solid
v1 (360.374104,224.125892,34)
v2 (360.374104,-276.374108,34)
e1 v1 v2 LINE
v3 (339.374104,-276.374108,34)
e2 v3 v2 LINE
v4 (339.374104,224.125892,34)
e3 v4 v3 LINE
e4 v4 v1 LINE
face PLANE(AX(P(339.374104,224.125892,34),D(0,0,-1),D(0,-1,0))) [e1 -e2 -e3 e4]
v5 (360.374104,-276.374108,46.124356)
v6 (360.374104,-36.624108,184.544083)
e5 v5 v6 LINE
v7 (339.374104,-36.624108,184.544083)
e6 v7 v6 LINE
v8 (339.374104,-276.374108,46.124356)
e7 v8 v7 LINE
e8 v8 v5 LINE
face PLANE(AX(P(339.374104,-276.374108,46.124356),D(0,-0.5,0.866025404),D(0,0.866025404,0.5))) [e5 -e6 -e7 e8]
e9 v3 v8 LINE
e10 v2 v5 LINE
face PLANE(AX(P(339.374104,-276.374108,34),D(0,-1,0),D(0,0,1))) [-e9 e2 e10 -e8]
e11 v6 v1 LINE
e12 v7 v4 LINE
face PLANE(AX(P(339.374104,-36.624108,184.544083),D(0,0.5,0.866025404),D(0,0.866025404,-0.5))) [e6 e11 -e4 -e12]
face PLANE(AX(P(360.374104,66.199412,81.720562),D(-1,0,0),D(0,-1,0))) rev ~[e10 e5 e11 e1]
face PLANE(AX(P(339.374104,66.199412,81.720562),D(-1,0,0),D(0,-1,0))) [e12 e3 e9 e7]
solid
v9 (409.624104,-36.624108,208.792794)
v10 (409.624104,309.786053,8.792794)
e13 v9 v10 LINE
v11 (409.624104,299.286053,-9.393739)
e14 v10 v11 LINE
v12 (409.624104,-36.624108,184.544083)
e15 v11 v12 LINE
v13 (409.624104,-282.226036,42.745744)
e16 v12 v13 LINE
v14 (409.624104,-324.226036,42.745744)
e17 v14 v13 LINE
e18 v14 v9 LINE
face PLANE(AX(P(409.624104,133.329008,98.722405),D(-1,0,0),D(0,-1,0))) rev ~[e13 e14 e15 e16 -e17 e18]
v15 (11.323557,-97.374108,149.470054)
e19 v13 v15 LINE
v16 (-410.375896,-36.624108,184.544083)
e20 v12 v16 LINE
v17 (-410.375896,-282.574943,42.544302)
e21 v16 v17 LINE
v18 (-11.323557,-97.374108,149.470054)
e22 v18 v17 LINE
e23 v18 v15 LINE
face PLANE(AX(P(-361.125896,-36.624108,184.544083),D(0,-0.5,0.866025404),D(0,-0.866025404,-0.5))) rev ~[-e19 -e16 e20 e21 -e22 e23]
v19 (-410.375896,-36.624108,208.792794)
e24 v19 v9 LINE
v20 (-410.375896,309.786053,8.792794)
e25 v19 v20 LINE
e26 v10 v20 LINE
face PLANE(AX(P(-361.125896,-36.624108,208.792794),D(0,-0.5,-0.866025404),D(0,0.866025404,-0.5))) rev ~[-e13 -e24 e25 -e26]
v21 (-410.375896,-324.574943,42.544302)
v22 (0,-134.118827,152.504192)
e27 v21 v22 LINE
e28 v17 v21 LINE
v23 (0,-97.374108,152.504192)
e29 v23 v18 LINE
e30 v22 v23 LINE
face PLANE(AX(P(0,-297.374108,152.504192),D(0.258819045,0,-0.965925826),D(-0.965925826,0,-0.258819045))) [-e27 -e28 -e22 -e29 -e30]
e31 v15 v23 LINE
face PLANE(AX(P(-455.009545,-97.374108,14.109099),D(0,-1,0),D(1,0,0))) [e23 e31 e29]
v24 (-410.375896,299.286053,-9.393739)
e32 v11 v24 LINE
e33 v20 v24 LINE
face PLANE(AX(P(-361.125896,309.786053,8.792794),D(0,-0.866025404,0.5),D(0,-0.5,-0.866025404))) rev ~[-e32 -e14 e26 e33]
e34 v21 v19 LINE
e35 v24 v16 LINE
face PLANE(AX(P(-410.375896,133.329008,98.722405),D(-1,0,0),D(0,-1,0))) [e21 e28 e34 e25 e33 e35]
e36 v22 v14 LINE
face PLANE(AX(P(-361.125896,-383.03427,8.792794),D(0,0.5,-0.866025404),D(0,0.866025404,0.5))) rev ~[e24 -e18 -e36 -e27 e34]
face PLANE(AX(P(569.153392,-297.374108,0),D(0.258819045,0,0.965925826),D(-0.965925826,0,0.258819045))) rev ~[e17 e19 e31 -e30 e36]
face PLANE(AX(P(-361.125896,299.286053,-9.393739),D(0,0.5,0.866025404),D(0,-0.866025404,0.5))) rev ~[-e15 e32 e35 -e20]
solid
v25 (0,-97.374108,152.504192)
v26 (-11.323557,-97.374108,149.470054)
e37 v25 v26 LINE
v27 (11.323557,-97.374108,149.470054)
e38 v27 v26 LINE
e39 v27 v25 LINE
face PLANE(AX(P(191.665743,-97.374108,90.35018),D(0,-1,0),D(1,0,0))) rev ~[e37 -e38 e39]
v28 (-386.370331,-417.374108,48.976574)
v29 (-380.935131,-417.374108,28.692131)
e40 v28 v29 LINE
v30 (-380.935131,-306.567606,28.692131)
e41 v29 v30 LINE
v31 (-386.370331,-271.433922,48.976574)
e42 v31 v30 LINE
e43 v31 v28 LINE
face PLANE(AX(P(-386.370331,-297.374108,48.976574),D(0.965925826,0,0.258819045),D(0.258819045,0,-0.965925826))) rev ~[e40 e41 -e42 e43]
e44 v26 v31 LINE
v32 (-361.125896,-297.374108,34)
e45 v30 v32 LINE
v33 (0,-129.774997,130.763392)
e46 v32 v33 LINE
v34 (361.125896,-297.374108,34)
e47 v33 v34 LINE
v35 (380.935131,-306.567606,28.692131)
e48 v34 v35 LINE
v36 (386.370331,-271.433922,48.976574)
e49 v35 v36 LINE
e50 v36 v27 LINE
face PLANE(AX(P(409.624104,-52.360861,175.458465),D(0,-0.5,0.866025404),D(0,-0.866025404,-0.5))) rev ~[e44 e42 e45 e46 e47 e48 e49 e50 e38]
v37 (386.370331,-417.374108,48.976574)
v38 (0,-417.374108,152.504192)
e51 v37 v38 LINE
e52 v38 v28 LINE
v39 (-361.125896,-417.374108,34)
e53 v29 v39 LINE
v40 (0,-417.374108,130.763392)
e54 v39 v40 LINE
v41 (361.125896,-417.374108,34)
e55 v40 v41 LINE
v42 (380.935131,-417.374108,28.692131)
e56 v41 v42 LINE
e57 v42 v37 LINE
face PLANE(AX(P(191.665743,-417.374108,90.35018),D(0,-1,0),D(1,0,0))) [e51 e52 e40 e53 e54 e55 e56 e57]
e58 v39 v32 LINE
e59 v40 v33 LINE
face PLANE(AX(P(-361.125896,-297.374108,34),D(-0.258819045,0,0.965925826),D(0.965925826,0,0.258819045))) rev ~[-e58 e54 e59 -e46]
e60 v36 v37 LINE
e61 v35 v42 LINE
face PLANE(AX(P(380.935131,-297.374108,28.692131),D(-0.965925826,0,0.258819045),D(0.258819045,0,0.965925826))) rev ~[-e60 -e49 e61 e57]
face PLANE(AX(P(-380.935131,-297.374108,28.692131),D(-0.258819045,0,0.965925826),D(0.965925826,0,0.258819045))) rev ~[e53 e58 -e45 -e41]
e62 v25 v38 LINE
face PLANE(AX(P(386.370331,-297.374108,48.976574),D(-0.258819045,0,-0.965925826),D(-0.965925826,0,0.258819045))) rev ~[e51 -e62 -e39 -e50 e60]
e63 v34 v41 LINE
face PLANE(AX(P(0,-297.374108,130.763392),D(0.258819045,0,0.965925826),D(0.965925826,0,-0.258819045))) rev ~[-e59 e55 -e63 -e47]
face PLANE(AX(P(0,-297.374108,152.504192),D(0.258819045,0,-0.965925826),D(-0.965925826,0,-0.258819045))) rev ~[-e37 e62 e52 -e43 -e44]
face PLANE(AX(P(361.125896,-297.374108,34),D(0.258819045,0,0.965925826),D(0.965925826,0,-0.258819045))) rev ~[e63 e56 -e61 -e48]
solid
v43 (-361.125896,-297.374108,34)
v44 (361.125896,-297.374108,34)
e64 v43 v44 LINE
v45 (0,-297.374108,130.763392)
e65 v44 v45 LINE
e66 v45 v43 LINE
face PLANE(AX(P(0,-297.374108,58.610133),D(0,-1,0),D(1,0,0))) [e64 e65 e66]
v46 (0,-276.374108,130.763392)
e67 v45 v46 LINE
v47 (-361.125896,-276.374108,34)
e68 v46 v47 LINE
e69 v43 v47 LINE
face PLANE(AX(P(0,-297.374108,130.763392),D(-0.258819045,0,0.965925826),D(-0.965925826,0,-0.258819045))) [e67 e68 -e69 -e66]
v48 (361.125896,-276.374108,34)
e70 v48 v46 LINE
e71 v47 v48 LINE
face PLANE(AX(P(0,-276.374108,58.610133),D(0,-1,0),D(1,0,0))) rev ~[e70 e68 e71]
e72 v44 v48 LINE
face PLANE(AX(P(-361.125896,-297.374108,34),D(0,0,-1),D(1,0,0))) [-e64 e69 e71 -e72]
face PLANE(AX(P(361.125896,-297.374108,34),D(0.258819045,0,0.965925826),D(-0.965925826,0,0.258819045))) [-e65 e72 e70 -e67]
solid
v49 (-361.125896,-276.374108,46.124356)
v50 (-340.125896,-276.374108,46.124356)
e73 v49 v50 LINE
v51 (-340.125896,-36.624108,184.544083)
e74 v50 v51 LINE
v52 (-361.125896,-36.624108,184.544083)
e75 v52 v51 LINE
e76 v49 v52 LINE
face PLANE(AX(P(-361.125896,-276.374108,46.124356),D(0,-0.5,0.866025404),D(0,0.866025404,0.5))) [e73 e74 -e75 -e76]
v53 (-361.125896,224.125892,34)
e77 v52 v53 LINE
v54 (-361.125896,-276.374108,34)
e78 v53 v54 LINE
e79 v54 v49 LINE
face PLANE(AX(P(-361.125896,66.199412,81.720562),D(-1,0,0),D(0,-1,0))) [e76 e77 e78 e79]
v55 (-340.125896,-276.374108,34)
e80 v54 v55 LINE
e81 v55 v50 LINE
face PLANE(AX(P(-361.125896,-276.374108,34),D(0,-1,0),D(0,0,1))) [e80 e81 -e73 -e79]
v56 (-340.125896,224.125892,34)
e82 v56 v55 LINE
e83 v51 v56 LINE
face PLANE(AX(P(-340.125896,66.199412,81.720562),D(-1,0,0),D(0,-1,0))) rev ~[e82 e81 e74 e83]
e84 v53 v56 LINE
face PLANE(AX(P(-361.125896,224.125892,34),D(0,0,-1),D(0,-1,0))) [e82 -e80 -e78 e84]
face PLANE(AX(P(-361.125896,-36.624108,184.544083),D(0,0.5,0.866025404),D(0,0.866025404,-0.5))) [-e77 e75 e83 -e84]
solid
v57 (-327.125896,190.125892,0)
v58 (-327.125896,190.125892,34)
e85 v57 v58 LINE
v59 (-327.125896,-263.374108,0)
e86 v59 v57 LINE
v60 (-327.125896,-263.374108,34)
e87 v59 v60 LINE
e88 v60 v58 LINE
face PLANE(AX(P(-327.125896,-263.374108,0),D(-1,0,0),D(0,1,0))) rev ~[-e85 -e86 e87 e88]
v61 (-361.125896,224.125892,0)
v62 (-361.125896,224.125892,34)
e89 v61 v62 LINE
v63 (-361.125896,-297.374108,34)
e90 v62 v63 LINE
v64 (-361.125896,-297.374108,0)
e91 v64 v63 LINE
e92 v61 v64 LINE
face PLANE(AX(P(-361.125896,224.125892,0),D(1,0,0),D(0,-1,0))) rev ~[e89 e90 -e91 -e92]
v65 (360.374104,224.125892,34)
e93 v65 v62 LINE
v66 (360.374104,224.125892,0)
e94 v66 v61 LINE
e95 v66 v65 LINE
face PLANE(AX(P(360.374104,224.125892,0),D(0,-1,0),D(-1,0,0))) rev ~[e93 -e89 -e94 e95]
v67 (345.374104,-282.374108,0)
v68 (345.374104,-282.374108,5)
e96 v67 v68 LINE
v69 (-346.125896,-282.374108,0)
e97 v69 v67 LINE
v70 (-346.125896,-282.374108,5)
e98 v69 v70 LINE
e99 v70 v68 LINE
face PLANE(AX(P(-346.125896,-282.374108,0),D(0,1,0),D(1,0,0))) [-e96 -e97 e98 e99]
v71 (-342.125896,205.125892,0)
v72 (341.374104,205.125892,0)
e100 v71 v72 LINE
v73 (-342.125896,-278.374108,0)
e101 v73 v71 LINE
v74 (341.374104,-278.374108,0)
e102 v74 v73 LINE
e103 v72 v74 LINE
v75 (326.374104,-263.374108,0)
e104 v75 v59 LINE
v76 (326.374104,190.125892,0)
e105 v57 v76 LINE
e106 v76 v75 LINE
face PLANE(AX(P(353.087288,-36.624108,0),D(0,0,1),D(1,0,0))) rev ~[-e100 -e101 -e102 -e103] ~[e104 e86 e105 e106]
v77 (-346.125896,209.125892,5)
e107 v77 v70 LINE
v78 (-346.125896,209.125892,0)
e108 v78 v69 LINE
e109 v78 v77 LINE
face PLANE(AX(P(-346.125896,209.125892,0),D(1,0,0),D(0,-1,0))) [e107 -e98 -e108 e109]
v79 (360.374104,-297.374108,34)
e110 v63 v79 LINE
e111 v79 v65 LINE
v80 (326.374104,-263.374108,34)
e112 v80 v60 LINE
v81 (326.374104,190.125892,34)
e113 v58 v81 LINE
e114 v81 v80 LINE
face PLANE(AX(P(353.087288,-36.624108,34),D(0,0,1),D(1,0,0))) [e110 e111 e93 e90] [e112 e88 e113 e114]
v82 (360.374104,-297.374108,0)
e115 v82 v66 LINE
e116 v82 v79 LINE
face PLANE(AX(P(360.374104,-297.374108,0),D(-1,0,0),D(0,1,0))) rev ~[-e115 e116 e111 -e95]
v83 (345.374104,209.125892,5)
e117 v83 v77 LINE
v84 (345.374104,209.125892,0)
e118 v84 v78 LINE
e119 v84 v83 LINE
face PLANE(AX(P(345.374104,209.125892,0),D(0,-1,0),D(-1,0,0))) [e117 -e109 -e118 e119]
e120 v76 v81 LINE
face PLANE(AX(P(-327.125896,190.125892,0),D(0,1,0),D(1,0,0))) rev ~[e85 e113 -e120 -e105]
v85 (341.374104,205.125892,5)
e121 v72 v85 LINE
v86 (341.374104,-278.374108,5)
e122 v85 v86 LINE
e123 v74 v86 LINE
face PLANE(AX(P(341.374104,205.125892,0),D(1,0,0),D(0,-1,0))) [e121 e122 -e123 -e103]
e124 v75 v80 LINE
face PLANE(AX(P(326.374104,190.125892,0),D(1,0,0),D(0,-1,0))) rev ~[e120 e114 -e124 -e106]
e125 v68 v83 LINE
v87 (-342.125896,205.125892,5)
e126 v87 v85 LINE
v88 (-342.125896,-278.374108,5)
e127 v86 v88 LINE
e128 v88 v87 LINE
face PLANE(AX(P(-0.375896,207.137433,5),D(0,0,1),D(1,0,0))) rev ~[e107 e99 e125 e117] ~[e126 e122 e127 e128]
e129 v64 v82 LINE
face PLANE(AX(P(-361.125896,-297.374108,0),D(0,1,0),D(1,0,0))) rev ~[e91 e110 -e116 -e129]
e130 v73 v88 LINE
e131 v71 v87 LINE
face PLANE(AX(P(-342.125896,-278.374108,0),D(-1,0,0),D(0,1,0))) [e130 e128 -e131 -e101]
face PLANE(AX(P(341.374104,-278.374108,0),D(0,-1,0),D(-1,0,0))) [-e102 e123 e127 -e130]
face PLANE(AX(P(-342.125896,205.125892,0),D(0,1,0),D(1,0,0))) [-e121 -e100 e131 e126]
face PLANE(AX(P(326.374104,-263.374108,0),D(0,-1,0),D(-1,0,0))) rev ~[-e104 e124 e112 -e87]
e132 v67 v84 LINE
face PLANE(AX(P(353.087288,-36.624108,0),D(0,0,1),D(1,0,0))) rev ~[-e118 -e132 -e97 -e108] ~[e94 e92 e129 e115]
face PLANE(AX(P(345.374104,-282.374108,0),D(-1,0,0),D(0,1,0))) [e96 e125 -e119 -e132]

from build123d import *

# Parameters (mm, degrees)
F1_DEPTH       = 34
F3_DEPTH       = 770.75
F3_DEPTH_BACK  = 49.25
F4_DEPTH       = 21
F5_START       = -700.5
F5_DEPTH       = 21
F6_DEPTH       = 5
F8_DEPTH       = 21
F7_W           = 721.5
F7_H           = 34
F9_DEPTH       = 200
F9_DEPTH_BACK  = 50
F10_W          = 820
F10_H          = 41.1768076986
F11_DEPTH      = 50
F11_TAPER      = -3
F12_DEPTH      = 200
F12_DEPTH_BACK = 120
F14_DEPTH      = 300
F16_DEPTH      = 800


with BuildPart() as f1:
    # F0 (on Top) → F1 (new body)
    with BuildSketch(Plane.XY):
        Polygon((345.3741043846, -282.3741084489), (360.3741043846, -297.3741084489), (360.3741043846, 224.1258915511), (345.3741043846, 209.1258915511), align=None)
        Polygon((326.3741043846, -263.3741084489), (341.3741043846, -278.3741084489), (341.3741043846, 205.1258915511), (326.3741043846, 190.1258915511), align=None)
        Polygon((-346.1258956154, -282.3741084489), (-361.1258956154, -297.3741084489), (360.3741043846, -297.3741084489), (345.3741043846, -282.3741084489), align=None)
        Polygon((360.3741043846, 224.1258915511), (-361.1258956154, 224.1258915511), (-346.1258956154, 209.1258915511), (345.3741043846, 209.1258915511), align=None)
        Polygon((-361.1258956154, 224.1258915511), (-361.1258956154, -297.3741084489), (-346.1258956154, -282.3741084489), (-346.1258956154, 209.1258915511), align=None)
        Polygon((-327.1258956154, -263.3741084489), (-342.1258956154, -278.3741084489), (341.3741043846, -278.3741084489), (326.3741043846, -263.3741084489), align=None)
        Polygon((-342.1258956154, 205.1258915511), (-342.1258956154, -278.3741084489), (-327.1258956154, -263.3741084489), (-327.1258956154, 190.1258915511), align=None)
        Polygon((341.3741043846, 205.1258915511), (-342.1258956154, 205.1258915511), (-327.1258956154, 190.1258915511), (326.3741043846, 190.1258915511), align=None)
        Polygon((341.3741043846, -278.3741084489), (345.3741043846, -282.3741084489), (345.3741043846, 209.1258915511), (341.3741043846, 205.1258915511), align=None)
        Polygon((-342.1258956154, -278.3741084489), (-346.1258956154, -282.3741084489), (345.3741043846, -282.3741084489), (341.3741043846, -278.3741084489), align=None)
        Polygon((-346.1258956154, 209.1258915511), (-346.1258956154, -282.3741084489), (-342.1258956154, -278.3741084489), (-342.1258956154, 205.1258915511), align=None)
        Polygon((345.3741043846, 209.1258915511), (-346.1258956154, 209.1258915511), (-342.1258956154, 205.1258915511), (341.3741043846, 205.1258915511), align=None)
    extrude(amount=F1_DEPTH)

    # F0 (on Top) → F6 (cut)
    with BuildSketch(Plane.XY):
        Polygon((345.3741043846, 209.1258915511), (-346.1258956154, 209.1258915511), (-342.1258956154, 205.1258915511), (341.3741043846, 205.1258915511), align=None)
        Polygon((-346.1258956154, 209.1258915511), (-346.1258956154, -282.3741084489), (-342.1258956154, -278.3741084489), (-342.1258956154, 205.1258915511), align=None)
        Polygon((-342.1258956154, -278.3741084489), (-346.1258956154, -282.3741084489), (345.3741043846, -282.3741084489), (341.3741043846, -278.3741084489), align=None)
        Polygon((341.3741043846, -278.3741084489), (345.3741043846, -282.3741084489), (345.3741043846, 209.1258915511), (341.3741043846, 205.1258915511), align=None)
    extrude(amount=F6_DEPTH, mode=Mode.SUBTRACT)


with BuildPart() as f3:
    # F2 (on face) → F3 (new body, two sides)
    with BuildSketch(Plane(origin=(-361.1258956154, 0, 0), x_dir=(0, -1, 0), z_dir=(-1, 0, 0))) as f3_sk:
        Polygon((-224.1258915511, 34), (36.6241084489, 184.5440826912), (36.6241084489, 208.7927939972), (-309.7860530649, 8.7927939972), (-299.2860530649, -9.3937394823), align=None)
        Polygon((36.6241084489, 208.7927939972), (36.6241084489, 184.5440826912), (276.3741084489, 46.124355653), (297.3741084489, 34), (372.5342699626, -9.3937394823), (383.0342699626, 8.7927939972), align=None)
    extrude(amount=-F3_DEPTH)
    extrude(f3_sk.sketch, amount=F3_DEPTH_BACK)

    # F7 (on face) → F9 (cut, two sides)
    with BuildSketch(Plane.XZ.offset(297.3741084489)) as f9_sk:
        Polygon((-361.1258956154, 0), (-361.1258956154, 34), (-380.9351305685, 28.6921314917), (-386.3703305156, 48.9765738437), (-569.1533924811, 0), align=None)
        Polygon((-380.9351305685, 28.6921314917), (-361.1258956154, 34), (0, 130.7633920961), (0, 152.5041918847), (-386.3703305156, 48.9765738437), align=None)
        Polygon((361.1258956154, 34), (360.3741043846, 34), (360.3741043846, 0), (569.1533924811, 0), (386.3703305156, 48.9765738437), (380.9351305685, 28.6921314917), align=None)
        Polygon((0, 152.5041918847), (0, 130.7633920961), (361.1258956154, 34), (380.9351305685, 28.6921314917), (386.3703305156, 48.9765738437), align=None)
        Polygon((0, 130.7633920961), (-361.1258956154, 34), (360.3741043846, 34), (361.1258956154, 34), align=None)
        with Locations((-0.3758956154, 17)):
            Rectangle(F7_W, F7_H)
    extrude(amount=-F9_DEPTH, mode=Mode.SUBTRACT)
    extrude(f9_sk.sketch, amount=F9_DEPTH_BACK, mode=Mode.SUBTRACT)

    # F10 (on face) → F11 (cut)
    with BuildSketch(Plane(origin=(0, -99.5659589765, 172.4532996517), x_dir=(1, 0, 0), z_dir=(0, -0.5, 0.8660254038))):
        Polygon((409.6241043846, -259.4151114743), (0, -39.8982155339), (-410.3758956154, -259.8179951806), (-612.6573998522, -368.2203265886), (612.6573998522, -368.2203265886), align=None)
        with Locations((-0.3758956154, -306.7326074598)):
            Rectangle(F10_W, F10_H, mode=Mode.SUBTRACT)
        with Locations((-0.3758956154, -306.7326074598)):
            Rectangle(F10_W, F10_H)
    extrude(amount=-F11_DEPTH, taper=F11_TAPER, mode=Mode.SUBTRACT)


with BuildPart() as f4:
    # F2 (on face) → F4 (new body)
    with BuildSketch(Plane(origin=(-361.1258956154, 0, 0), x_dir=(0, -1, 0), z_dir=(-1, 0, 0))):
        Polygon((-203.1258915511, 34), (36.6241084489, 34), (36.6241084489, 184.5440826912), (-224.1258915511, 34), align=None)
        Polygon((36.6241084489, 184.5440826912), (36.6241084489, 34), (276.3741084489, 34), (276.3741084489, 46.124355653), align=None)
    extrude(amount=-F4_DEPTH)


with BuildPart() as f5:
    # F2 (on face) → F5 (new body)
    with BuildSketch(Plane(origin=(-361.1258956154, 0, 0), x_dir=(0, -1, 0), z_dir=(-1, 0, 0)).offset(F5_START)):
        Polygon((-203.1258915511, 34), (36.6241084489, 34), (36.6241084489, 184.5440826912), (-224.1258915511, 34), align=None)
        Polygon((36.6241084489, 184.5440826912), (36.6241084489, 34), (276.3741084489, 34), (276.3741084489, 46.124355653), align=None)
    extrude(amount=-F5_DEPTH)


with BuildPart() as f8:
    # F7 (on face) → F8 (new body)
    with BuildSketch(Plane.XZ.offset(297.3741084489)):
        Polygon((0, 130.7633920961), (-361.1258956154, 34), (360.3741043846, 34), (361.1258956154, 34), align=None)
    extrude(amount=-F8_DEPTH)


with BuildPart() as f12:
    # F7 (on face) → F12 (new body, two sides)
    with BuildSketch(Plane.XZ.offset(297.3741084489)) as f12_sk:
        Polygon((0, 152.5041918847), (0, 130.7633920961), (361.1258956154, 34), (380.9351305685, 28.6921314917), (386.3703305156, 48.9765738437), align=None)
        Polygon((-380.9351305685, 28.6921314917), (-361.1258956154, 34), (0, 130.7633920961), (0, 152.5041918847), (-386.3703305156, 48.9765738437), align=None)
    extrude(amount=-F12_DEPTH)
    extrude(f12_sk.sketch, amount=F12_DEPTH_BACK)

    # F13 (on face) → F14 (cut)
    with BuildSketch(Plane(origin=(0, -89.0659589765, 154.2667661722), x_dir=(1, 0, 0), z_dir=(0, 0.5, -0.8660254038))):
        Polygon((-410.3758956154, -60.5546330379), (409.6241043846, -60.5546330379), (409.6241043846, 223.0420445153), (11.3235573479, 9.5934246686), (-11.3235573479, 9.5934246686), (-410.3758956154, 223.4449282217), align=None)
    extrude(amount=F14_DEPTH, mode=Mode.SUBTRACT)

    # F15 (on face) → F16 (cut)
    with BuildSketch(Plane.YZ.offset(409.6241043846)):
        Polygon((-24.5864332149, 127.3517449025), (-52.3608607368, 175.4584645216), (-282.2260356388, 42.7457439146), (-409.6211082826, -30.8058355697), (-403.7217834932, -91.54215164), align=None)
    extrude(amount=-F16_DEPTH, mode=Mode.SUBTRACT)


solid = Compound([f1.part, f3.part, f4.part, f5.part, f8.part, f12.part])
